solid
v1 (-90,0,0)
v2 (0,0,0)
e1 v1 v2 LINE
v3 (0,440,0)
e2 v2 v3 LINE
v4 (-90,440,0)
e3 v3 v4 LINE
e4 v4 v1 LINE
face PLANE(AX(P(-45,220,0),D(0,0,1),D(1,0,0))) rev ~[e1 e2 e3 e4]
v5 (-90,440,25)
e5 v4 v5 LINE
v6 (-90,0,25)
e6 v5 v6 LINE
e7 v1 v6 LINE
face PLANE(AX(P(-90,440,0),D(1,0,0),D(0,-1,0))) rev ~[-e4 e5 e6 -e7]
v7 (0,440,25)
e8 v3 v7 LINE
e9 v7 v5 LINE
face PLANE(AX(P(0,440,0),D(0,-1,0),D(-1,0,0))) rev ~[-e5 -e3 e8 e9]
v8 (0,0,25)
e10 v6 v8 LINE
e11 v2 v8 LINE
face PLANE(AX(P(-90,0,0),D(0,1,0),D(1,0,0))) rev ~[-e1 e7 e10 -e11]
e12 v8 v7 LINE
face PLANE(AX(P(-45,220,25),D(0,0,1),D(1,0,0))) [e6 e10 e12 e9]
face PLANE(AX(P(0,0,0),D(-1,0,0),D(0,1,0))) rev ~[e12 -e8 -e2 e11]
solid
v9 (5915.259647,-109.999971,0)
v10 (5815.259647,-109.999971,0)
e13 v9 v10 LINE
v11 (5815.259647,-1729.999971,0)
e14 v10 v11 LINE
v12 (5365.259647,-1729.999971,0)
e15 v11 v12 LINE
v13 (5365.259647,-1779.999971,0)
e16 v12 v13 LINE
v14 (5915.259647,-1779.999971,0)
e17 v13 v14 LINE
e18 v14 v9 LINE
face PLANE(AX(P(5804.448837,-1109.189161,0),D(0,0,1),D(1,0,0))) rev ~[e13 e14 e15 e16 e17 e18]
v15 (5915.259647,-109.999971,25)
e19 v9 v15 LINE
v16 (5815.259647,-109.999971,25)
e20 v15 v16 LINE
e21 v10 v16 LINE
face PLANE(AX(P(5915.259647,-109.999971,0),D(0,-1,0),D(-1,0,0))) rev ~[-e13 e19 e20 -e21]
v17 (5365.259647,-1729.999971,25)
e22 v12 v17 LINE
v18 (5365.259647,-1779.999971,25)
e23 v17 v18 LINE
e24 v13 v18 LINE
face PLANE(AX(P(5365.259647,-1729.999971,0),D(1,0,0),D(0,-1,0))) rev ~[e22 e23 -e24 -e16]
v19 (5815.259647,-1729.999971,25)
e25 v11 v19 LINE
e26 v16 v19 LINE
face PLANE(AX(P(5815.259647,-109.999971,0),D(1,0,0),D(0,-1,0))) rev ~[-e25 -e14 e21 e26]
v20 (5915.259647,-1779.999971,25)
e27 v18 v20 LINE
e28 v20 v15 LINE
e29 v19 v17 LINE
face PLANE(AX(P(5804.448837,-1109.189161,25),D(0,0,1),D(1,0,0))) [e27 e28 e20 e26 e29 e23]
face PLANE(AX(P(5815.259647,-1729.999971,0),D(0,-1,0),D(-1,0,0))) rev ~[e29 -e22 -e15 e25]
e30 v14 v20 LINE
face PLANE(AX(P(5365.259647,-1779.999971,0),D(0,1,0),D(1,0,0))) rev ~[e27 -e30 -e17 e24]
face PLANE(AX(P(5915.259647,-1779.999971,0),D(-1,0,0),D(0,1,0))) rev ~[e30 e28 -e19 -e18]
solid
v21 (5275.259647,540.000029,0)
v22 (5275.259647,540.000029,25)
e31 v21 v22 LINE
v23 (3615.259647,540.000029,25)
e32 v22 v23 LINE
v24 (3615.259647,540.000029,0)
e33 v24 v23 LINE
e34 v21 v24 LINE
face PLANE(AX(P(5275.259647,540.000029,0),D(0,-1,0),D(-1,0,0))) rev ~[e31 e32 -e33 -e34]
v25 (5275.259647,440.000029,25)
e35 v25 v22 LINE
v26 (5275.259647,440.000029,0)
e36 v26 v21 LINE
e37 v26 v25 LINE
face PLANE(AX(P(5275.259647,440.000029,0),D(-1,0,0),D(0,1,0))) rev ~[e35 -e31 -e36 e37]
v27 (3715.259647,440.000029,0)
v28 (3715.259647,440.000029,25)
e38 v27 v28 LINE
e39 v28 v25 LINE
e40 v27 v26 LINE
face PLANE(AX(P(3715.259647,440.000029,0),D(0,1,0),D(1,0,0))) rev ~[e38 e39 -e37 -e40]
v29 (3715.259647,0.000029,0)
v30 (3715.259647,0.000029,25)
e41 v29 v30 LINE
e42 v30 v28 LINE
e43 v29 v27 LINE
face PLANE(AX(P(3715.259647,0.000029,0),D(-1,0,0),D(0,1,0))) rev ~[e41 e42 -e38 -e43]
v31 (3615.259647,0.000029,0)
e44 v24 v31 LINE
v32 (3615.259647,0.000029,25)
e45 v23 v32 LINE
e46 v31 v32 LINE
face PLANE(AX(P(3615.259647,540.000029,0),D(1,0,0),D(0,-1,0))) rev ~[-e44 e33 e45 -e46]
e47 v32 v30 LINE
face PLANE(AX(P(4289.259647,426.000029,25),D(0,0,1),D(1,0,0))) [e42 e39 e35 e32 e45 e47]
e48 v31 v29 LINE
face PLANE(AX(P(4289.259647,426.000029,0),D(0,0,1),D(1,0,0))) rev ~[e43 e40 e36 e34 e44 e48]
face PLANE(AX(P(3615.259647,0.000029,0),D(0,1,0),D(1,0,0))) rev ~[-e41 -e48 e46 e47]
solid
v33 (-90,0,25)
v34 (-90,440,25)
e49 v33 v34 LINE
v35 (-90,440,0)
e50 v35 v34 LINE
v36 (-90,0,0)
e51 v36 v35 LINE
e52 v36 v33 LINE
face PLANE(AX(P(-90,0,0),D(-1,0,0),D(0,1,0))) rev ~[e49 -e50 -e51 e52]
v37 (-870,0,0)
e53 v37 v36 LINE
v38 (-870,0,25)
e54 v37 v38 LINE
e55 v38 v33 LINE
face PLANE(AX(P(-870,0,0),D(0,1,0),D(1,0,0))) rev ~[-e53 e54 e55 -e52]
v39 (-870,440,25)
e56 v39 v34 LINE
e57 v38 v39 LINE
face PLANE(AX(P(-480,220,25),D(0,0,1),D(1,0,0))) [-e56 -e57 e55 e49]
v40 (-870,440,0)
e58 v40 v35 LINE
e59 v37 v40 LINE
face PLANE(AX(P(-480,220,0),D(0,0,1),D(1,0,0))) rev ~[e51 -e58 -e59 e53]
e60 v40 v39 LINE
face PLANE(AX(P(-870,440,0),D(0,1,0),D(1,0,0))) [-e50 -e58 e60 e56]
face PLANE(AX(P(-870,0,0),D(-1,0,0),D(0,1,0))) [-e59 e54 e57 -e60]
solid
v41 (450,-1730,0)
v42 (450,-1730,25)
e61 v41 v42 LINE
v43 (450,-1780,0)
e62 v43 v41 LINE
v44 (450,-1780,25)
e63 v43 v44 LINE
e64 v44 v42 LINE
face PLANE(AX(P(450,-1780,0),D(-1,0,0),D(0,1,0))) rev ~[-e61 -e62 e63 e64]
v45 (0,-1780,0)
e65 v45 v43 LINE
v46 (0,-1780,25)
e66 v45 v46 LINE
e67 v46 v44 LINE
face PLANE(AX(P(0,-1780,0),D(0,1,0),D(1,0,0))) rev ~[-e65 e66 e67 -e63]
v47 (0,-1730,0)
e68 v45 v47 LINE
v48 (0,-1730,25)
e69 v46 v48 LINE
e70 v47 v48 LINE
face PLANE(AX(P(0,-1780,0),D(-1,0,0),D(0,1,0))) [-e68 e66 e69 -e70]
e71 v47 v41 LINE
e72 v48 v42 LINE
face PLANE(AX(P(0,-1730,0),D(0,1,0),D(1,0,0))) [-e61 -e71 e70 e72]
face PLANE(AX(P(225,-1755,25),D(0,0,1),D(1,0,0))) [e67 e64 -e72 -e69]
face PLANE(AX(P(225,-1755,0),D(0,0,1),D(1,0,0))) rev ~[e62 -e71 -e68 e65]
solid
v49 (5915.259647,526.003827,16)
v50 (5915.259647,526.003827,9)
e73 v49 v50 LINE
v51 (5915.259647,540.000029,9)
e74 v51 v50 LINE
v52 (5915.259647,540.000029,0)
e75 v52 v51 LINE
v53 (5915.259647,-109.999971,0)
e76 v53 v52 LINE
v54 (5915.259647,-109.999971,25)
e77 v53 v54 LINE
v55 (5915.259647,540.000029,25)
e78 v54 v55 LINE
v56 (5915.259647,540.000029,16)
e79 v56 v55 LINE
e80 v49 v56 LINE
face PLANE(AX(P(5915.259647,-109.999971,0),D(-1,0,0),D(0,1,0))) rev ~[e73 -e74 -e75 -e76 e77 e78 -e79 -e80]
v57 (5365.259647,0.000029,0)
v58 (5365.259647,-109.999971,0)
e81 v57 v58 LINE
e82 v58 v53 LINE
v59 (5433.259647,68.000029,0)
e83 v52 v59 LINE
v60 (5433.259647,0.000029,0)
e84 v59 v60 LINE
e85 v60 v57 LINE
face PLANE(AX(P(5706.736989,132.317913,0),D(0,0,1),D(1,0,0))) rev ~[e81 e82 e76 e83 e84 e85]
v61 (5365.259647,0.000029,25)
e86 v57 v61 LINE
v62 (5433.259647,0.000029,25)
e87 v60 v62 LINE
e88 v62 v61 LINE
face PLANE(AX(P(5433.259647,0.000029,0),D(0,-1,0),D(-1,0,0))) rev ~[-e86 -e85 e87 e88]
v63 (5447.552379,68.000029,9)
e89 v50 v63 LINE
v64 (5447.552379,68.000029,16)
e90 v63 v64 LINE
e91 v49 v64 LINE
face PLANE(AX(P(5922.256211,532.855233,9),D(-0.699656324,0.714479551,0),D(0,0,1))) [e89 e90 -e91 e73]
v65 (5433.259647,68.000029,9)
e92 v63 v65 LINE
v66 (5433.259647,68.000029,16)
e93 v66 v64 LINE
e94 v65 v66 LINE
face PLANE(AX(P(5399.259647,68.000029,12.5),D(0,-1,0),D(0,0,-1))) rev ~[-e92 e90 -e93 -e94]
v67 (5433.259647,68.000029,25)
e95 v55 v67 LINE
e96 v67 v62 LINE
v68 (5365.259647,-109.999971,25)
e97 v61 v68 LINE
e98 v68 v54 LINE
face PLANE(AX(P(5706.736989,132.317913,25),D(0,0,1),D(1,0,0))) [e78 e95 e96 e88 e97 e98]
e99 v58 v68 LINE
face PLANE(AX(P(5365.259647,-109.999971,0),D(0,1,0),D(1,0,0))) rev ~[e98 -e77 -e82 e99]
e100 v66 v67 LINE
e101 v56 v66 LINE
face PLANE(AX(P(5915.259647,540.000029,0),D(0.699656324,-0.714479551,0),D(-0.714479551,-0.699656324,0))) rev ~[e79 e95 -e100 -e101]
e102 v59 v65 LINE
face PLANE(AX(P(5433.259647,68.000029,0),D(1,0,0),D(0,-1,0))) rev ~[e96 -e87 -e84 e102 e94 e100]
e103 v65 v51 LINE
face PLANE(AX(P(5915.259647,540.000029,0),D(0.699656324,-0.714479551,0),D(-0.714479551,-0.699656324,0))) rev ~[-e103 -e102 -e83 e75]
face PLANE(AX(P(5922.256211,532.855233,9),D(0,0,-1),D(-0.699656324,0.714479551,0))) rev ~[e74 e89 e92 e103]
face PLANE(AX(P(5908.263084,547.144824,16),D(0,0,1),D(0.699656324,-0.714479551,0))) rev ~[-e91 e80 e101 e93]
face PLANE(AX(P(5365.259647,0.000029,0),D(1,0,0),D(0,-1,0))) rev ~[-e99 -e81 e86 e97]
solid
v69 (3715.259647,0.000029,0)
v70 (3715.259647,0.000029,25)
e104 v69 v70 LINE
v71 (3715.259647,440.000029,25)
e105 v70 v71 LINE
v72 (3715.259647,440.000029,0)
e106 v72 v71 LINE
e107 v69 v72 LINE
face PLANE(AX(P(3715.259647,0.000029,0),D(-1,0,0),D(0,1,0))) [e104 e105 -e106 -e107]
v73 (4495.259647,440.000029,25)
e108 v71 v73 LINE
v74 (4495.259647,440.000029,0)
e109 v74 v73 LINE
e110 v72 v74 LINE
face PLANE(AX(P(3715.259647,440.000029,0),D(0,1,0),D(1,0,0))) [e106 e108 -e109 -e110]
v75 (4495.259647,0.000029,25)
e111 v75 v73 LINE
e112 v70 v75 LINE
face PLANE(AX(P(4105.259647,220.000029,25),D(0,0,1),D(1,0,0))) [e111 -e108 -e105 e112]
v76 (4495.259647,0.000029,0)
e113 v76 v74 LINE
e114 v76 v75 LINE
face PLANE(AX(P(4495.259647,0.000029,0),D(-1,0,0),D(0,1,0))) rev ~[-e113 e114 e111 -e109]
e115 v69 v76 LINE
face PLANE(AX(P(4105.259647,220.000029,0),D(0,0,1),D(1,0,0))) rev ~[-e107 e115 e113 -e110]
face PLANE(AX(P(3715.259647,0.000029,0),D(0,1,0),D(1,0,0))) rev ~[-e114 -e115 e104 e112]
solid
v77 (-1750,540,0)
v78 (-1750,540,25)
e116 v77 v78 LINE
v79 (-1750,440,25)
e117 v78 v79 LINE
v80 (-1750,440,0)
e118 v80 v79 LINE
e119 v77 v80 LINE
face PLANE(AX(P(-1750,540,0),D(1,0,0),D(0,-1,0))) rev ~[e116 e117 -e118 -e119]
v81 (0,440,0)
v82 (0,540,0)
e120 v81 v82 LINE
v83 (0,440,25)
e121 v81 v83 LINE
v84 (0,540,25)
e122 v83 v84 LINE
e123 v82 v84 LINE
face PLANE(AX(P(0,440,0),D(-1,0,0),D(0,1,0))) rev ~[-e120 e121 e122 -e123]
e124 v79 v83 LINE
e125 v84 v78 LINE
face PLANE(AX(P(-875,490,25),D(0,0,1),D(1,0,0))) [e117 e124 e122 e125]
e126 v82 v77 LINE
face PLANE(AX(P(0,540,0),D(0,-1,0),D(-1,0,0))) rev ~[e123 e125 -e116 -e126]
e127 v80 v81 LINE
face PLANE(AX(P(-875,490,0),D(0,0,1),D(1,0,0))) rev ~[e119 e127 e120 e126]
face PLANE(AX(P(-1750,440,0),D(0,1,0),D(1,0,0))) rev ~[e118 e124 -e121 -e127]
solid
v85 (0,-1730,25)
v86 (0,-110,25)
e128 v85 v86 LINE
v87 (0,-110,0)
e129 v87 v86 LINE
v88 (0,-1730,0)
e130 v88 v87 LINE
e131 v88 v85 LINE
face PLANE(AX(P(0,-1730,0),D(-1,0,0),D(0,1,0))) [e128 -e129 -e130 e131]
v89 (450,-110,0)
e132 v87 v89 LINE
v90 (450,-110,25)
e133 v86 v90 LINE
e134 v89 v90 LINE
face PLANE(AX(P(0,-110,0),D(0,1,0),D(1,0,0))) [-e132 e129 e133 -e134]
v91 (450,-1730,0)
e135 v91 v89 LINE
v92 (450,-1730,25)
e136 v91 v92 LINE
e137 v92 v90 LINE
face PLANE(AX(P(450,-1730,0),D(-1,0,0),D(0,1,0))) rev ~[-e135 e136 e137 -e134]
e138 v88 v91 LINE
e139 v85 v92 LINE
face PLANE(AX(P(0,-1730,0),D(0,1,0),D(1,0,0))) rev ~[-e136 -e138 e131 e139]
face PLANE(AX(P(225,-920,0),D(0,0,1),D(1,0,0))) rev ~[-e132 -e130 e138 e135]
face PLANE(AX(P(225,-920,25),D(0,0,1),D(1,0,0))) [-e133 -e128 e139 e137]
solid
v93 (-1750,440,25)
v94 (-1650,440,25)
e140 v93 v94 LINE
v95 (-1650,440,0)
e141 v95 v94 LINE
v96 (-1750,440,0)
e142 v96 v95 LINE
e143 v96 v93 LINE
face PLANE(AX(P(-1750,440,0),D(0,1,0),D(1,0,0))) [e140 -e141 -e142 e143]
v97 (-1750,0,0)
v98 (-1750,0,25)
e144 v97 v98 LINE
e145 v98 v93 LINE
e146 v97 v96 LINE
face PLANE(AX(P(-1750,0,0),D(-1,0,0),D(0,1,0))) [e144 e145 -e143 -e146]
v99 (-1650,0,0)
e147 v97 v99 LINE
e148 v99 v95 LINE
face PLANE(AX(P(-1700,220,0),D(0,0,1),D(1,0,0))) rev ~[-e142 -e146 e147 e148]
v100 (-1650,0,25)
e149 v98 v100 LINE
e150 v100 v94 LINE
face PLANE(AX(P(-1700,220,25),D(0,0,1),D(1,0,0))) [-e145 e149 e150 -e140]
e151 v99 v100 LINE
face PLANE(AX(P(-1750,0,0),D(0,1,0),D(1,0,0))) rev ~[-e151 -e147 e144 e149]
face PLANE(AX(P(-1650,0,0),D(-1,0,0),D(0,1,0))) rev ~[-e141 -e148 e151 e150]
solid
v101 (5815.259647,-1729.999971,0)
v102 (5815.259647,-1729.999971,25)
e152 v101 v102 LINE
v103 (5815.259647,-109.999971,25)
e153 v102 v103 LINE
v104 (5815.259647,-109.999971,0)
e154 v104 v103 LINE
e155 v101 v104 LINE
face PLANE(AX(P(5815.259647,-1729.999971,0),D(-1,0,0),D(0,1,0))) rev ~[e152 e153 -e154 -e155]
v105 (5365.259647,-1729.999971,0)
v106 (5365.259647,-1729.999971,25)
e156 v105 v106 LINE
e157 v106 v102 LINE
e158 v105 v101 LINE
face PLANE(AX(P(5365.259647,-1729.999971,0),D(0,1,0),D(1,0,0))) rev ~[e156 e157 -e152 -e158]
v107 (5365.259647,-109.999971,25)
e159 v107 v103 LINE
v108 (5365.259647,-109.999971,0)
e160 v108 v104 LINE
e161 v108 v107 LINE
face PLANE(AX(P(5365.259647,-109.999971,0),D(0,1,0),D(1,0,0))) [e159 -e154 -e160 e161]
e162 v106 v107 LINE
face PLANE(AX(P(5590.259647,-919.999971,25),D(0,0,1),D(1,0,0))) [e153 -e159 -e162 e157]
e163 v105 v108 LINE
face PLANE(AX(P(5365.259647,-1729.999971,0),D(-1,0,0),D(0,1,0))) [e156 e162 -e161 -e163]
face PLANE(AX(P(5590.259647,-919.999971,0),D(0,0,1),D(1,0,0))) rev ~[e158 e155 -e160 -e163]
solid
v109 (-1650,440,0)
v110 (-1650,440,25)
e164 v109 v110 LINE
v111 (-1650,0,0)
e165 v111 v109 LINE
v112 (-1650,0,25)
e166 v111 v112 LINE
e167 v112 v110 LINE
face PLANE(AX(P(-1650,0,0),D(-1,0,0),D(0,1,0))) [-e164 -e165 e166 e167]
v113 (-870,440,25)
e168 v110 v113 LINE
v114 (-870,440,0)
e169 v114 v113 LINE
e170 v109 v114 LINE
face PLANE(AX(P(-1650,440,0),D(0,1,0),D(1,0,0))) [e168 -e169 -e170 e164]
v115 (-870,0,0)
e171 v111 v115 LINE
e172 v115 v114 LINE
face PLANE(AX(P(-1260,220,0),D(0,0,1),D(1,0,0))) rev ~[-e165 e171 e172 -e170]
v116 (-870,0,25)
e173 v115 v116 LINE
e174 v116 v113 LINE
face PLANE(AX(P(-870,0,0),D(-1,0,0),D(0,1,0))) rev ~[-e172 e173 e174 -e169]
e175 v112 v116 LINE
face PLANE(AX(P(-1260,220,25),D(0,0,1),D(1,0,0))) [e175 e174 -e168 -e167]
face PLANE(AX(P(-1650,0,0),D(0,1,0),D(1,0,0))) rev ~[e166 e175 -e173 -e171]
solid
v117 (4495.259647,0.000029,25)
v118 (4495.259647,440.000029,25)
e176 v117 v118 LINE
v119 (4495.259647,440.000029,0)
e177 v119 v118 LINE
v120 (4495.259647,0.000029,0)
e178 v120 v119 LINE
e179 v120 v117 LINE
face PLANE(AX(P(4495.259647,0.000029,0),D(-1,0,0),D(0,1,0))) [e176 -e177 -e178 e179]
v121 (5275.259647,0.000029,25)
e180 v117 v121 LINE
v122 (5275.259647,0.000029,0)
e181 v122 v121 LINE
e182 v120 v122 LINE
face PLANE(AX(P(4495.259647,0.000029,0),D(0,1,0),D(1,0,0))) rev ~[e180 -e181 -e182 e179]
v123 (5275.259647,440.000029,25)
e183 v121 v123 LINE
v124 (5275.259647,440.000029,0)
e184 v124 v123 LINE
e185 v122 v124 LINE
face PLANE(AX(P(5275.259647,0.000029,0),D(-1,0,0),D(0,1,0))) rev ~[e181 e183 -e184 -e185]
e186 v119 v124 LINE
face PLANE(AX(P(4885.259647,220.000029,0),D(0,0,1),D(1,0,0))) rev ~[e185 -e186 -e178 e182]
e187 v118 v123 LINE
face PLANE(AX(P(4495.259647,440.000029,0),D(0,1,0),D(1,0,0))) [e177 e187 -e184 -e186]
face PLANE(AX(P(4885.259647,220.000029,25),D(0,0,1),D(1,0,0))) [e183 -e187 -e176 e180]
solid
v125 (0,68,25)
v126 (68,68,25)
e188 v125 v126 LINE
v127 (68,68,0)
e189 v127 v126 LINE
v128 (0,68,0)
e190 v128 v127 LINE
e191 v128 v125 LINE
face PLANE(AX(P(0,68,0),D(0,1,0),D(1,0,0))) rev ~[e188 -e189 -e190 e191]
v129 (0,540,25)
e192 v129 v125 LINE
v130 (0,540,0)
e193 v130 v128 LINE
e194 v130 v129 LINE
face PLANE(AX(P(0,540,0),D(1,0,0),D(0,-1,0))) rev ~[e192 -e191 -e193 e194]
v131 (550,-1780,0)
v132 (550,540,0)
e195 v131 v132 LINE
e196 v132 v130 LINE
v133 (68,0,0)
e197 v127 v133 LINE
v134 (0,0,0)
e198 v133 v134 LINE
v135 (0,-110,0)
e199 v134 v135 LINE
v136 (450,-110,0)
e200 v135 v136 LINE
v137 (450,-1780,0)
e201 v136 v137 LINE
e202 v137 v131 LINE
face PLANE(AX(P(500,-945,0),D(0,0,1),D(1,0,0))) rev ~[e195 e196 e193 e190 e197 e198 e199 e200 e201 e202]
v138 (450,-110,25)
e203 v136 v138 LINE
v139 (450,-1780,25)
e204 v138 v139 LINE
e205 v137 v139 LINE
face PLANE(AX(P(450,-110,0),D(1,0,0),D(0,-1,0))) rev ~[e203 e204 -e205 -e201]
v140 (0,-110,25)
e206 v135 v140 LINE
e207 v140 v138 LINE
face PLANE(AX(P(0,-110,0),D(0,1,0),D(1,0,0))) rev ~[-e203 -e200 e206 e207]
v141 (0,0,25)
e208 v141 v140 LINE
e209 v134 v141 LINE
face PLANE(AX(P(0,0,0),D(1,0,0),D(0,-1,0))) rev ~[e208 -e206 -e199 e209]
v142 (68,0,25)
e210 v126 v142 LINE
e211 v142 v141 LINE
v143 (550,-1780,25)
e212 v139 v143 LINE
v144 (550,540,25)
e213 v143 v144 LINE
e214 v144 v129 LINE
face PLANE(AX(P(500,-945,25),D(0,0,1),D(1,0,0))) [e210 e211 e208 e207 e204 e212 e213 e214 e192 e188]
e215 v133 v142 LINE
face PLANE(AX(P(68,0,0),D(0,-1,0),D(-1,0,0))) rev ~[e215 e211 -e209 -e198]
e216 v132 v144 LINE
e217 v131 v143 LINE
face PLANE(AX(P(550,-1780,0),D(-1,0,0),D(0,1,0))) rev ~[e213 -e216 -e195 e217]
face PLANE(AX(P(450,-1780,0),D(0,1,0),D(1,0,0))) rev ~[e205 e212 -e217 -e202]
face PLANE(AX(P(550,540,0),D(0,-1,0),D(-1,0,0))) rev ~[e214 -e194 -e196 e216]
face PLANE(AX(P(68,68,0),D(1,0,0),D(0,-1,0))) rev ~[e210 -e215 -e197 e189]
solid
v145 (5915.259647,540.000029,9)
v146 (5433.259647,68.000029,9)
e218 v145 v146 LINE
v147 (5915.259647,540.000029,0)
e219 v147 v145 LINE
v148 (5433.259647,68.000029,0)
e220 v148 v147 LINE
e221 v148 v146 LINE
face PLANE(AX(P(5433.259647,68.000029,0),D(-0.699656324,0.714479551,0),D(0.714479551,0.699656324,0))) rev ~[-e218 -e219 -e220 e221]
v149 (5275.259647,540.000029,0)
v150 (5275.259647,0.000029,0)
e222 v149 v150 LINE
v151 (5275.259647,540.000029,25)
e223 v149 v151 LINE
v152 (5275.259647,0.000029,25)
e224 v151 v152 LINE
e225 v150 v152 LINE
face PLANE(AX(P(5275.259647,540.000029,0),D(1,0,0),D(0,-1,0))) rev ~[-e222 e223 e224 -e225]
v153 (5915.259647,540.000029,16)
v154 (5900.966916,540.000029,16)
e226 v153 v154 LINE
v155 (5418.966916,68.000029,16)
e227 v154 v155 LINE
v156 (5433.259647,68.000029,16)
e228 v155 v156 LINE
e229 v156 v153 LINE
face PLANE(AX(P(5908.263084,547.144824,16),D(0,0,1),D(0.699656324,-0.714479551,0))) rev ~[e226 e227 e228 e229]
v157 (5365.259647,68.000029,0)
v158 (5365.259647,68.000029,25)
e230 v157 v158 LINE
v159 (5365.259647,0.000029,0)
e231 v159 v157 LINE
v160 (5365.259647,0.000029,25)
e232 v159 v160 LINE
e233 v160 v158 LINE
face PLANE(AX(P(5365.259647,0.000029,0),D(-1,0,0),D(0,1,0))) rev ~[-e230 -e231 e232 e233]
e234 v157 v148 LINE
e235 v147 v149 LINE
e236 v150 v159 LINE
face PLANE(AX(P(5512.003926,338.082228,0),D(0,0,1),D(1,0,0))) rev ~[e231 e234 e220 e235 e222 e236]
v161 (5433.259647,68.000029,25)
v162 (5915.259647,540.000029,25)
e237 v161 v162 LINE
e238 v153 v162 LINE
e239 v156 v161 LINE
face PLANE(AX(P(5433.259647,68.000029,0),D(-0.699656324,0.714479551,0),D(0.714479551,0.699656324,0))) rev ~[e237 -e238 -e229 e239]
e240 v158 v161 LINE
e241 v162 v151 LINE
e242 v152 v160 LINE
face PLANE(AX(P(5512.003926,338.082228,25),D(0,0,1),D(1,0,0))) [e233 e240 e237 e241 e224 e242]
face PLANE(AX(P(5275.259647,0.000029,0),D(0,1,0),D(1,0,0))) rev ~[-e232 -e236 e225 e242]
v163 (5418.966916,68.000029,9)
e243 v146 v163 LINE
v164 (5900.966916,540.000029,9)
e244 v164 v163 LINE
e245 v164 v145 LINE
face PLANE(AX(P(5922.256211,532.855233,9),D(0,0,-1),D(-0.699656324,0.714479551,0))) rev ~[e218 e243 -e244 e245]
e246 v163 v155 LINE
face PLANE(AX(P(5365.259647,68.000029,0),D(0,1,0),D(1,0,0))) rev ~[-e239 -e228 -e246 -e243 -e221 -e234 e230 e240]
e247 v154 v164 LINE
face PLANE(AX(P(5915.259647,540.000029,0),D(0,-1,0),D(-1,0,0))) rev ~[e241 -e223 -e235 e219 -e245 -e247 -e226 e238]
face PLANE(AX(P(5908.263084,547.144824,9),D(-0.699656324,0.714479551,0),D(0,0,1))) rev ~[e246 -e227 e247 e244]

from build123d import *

# Parameters (mm, degrees)
F0_W     = 100
F0_H     = 440
F1_DEPTH = 25
F0_W_2   = 780
F0_W_3   = 450
F0_H_2   = 50
F2_DEPTH = 25
F0_H_3   = 1620
F3_DEPTH = 25
F4_DEPTH = 25
F6_W     = 10
F6_H     = 7
F7_REACH = 7112.0815171795


with BuildPart() as f1:
    # F0 (on Top) → F1 (new body)
    with BuildSketch(Plane.XY):
        with Locations((-1700, 220)):
            Rectangle(F0_W, F0_H)
    extrude(amount=F1_DEPTH)


with BuildPart() as f1b:
    # F0 (on Top) → F1, piece 2 (new body)
    with BuildSketch(Plane.XY):
        with Locations((-480, 220)):
            Rectangle(F0_W_2, F0_H)
    extrude(amount=F1_DEPTH)


with BuildPart() as f1c:
    # F0 (on Top) → F1, piece 3 (new body)
    with BuildSketch(Plane.XY):
        with Locations((225, -1755)):
            Rectangle(F0_W_3, F0_H_2)
    extrude(amount=F1_DEPTH)


with BuildPart() as f1d:
    # F0 (on Top) → F1, piece 4 (new body)
    with BuildSketch(Plane.XY):
        Polygon((4495.2596473694, 440.0000286102), (5275.2596473694, 440.0000286102), (5275.2596473694, 540.0000286102), (3615.2596473694, 540.0000286102), (3615.2596473694, 2.86102e-05), (3715.2596473694, 2.86102e-05), (3715.2596473694, 440.0000286102), align=None)
    extrude(amount=F1_DEPTH)


with BuildPart() as f1e:
    # F0 (on Top) → F1, piece 5 (new body)
    with BuildSketch(Plane.XY):
        Polygon((5433.2596473694, 2.86102e-05), (5365.2596473694, 2.86102e-05), (5365.2596473694, -109.9999713898), (5815.2596473694, -109.9999713898), (5915.2596473694, -109.9999713898), (5915.2596473694, 540.0000286102), (5433.2596473694, 68.0000286102), align=None)
    extrude(amount=F1_DEPTH)


with BuildPart() as f2:
    # F0 (on Top) → F2 (new body)
    with BuildSketch(Plane.XY):
        Polygon((550, -110), (450, -110), (450, -1730), (450, -1780), (550, -1780), align=None)
        Polygon((68, 0), (0, 0), (0, -110), (450, -110), (550, -110), (550, 540), (0, 540), (0, 440), (0, 68), (68, 68), align=None)
    extrude(amount=F2_DEPTH)


with BuildPart() as f2b:
    # F0 (on Top) → F2, piece 2 (new body)
    with BuildSketch(Plane.XY):
        with Locations((-1260, 220)):
            Rectangle(F0_W_2, F0_H)
    extrude(amount=F2_DEPTH)


with BuildPart() as f2c:
    # F0 (on Top) → F2, piece 3 (new body)
    with BuildSketch(Plane.XY):
        with Locations((4105.2596473694, 220.0000286102)):
            Rectangle(F0_W_2, F0_H)
    extrude(amount=F2_DEPTH)


with BuildPart() as f2d:
    # F0 (on Top) → F2, piece 4 (new body)
    with BuildSketch(Plane.XY):
        Polygon((5275.2596473694, 2.86102e-05), (5365.2596473694, 2.86102e-05), (5365.2596473694, 68.0000286102), (5433.2596473694, 68.0000286102), (5915.2596473694, 540.0000286102), (5275.2596473694, 540.0000286102), (5275.2596473694, 440.0000286102), align=None)
    extrude(amount=F2_DEPTH)


with BuildPart() as f2e:
    # F0 (on Top) → F2, piece 5 (new body)
    with BuildSketch(Plane.XY):
        with Locations((5590.2596473694, -919.9999713898)):
            Rectangle(F0_W_3, F0_H_3)
    extrude(amount=F2_DEPTH)


with BuildPart() as f3:
    # F0 (on Top) → F3 (new body)
    with BuildSketch(Plane.XY):
        with Locations((225, -920)):
            Rectangle(F0_W_3, F0_H_3)
    extrude(amount=F3_DEPTH)


with BuildPart() as f3b:
    # F0 (on Top) → F3, piece 2 (new body)
    with BuildSketch(Plane.XY):
        Polygon((-90, 440), (0, 440), (0, 540), (-1750, 540), (-1750, 440), (-1650, 440), (-870, 440), align=None)
    extrude(amount=F3_DEPTH)


with BuildPart() as f3c:
    # F0 (on Top) → F3, piece 3 (new body)
    with BuildSketch(Plane.XY):
        Polygon((5915.2596473694, -109.9999713898), (5815.2596473694, -109.9999713898), (5815.2596473694, -1729.9999713898), (5365.2596473694, -1729.9999713898), (5365.2596473694, -1779.9999713898), (5915.2596473694, -1779.9999713898), align=None)
    extrude(amount=F3_DEPTH)


with BuildPart() as f3d:
    # F0 (on Top) → F3, piece 4 (new body)
    with BuildSketch(Plane.XY):
        with Locations((4885.2596473694, 220.0000286102)):
            Rectangle(F0_W_2, F0_H)
    extrude(amount=F3_DEPTH)


with BuildPart() as f4:
    # F0 (on Top) → F4 (new body)
    with BuildSketch(Plane.XY):
        Polygon((-90, 0), (0, 0), (0, 68), (0, 440), (-90, 440), align=None)
    extrude(amount=F4_DEPTH)


with BuildPart() as f7:
    f7_end = Plane(origin=(5399.2596473694, 68.0000286102, 12.5), x_dir=(0, 0, -1), z_dir=(0, -1, 0))
    # F6 (on face) → F7 (new body, up to a plane its end follows)
    with BuildSketch(Plane(origin=(3289.5685174165, 3221.3202079265, 0), x_dir=(-0.6996563237, 0.7144795509, 0), z_dir=(0.7144795509, 0.6996563237, 0))):
        with Locations((-3747.8298407898, 12.5)):
            Rectangle(F6_W, F6_H)
        with Locations((-3757.8298407898, 12.5)):
            Rectangle(F6_W, F6_H)
    f7_long = extrude(amount=-F7_REACH, mode=Mode.PRIVATE)
    add(split(f7_long, bisect_by=f7_end, keep=Keep.BOTTOM, mode=Mode.PRIVATE))


with BuildPart() as f2d_1:
    add(f2d.part)

    # F8: cut F7
    add(f7.part, mode=Mode.SUBTRACT)


with BuildPart() as f1e_1:
    add(f1e.part)

    # F8: cut F7
    add(f7.part, mode=Mode.SUBTRACT)


solid = Compound([f1.part, f1b.part, f1c.part, f1d.part, f2.part, f2b.part, f2c.part, f2e.part, f3.part, f3b.part, f3c.part, f3d.part, f4.part, f2d_1.part, f1e_1.part])
